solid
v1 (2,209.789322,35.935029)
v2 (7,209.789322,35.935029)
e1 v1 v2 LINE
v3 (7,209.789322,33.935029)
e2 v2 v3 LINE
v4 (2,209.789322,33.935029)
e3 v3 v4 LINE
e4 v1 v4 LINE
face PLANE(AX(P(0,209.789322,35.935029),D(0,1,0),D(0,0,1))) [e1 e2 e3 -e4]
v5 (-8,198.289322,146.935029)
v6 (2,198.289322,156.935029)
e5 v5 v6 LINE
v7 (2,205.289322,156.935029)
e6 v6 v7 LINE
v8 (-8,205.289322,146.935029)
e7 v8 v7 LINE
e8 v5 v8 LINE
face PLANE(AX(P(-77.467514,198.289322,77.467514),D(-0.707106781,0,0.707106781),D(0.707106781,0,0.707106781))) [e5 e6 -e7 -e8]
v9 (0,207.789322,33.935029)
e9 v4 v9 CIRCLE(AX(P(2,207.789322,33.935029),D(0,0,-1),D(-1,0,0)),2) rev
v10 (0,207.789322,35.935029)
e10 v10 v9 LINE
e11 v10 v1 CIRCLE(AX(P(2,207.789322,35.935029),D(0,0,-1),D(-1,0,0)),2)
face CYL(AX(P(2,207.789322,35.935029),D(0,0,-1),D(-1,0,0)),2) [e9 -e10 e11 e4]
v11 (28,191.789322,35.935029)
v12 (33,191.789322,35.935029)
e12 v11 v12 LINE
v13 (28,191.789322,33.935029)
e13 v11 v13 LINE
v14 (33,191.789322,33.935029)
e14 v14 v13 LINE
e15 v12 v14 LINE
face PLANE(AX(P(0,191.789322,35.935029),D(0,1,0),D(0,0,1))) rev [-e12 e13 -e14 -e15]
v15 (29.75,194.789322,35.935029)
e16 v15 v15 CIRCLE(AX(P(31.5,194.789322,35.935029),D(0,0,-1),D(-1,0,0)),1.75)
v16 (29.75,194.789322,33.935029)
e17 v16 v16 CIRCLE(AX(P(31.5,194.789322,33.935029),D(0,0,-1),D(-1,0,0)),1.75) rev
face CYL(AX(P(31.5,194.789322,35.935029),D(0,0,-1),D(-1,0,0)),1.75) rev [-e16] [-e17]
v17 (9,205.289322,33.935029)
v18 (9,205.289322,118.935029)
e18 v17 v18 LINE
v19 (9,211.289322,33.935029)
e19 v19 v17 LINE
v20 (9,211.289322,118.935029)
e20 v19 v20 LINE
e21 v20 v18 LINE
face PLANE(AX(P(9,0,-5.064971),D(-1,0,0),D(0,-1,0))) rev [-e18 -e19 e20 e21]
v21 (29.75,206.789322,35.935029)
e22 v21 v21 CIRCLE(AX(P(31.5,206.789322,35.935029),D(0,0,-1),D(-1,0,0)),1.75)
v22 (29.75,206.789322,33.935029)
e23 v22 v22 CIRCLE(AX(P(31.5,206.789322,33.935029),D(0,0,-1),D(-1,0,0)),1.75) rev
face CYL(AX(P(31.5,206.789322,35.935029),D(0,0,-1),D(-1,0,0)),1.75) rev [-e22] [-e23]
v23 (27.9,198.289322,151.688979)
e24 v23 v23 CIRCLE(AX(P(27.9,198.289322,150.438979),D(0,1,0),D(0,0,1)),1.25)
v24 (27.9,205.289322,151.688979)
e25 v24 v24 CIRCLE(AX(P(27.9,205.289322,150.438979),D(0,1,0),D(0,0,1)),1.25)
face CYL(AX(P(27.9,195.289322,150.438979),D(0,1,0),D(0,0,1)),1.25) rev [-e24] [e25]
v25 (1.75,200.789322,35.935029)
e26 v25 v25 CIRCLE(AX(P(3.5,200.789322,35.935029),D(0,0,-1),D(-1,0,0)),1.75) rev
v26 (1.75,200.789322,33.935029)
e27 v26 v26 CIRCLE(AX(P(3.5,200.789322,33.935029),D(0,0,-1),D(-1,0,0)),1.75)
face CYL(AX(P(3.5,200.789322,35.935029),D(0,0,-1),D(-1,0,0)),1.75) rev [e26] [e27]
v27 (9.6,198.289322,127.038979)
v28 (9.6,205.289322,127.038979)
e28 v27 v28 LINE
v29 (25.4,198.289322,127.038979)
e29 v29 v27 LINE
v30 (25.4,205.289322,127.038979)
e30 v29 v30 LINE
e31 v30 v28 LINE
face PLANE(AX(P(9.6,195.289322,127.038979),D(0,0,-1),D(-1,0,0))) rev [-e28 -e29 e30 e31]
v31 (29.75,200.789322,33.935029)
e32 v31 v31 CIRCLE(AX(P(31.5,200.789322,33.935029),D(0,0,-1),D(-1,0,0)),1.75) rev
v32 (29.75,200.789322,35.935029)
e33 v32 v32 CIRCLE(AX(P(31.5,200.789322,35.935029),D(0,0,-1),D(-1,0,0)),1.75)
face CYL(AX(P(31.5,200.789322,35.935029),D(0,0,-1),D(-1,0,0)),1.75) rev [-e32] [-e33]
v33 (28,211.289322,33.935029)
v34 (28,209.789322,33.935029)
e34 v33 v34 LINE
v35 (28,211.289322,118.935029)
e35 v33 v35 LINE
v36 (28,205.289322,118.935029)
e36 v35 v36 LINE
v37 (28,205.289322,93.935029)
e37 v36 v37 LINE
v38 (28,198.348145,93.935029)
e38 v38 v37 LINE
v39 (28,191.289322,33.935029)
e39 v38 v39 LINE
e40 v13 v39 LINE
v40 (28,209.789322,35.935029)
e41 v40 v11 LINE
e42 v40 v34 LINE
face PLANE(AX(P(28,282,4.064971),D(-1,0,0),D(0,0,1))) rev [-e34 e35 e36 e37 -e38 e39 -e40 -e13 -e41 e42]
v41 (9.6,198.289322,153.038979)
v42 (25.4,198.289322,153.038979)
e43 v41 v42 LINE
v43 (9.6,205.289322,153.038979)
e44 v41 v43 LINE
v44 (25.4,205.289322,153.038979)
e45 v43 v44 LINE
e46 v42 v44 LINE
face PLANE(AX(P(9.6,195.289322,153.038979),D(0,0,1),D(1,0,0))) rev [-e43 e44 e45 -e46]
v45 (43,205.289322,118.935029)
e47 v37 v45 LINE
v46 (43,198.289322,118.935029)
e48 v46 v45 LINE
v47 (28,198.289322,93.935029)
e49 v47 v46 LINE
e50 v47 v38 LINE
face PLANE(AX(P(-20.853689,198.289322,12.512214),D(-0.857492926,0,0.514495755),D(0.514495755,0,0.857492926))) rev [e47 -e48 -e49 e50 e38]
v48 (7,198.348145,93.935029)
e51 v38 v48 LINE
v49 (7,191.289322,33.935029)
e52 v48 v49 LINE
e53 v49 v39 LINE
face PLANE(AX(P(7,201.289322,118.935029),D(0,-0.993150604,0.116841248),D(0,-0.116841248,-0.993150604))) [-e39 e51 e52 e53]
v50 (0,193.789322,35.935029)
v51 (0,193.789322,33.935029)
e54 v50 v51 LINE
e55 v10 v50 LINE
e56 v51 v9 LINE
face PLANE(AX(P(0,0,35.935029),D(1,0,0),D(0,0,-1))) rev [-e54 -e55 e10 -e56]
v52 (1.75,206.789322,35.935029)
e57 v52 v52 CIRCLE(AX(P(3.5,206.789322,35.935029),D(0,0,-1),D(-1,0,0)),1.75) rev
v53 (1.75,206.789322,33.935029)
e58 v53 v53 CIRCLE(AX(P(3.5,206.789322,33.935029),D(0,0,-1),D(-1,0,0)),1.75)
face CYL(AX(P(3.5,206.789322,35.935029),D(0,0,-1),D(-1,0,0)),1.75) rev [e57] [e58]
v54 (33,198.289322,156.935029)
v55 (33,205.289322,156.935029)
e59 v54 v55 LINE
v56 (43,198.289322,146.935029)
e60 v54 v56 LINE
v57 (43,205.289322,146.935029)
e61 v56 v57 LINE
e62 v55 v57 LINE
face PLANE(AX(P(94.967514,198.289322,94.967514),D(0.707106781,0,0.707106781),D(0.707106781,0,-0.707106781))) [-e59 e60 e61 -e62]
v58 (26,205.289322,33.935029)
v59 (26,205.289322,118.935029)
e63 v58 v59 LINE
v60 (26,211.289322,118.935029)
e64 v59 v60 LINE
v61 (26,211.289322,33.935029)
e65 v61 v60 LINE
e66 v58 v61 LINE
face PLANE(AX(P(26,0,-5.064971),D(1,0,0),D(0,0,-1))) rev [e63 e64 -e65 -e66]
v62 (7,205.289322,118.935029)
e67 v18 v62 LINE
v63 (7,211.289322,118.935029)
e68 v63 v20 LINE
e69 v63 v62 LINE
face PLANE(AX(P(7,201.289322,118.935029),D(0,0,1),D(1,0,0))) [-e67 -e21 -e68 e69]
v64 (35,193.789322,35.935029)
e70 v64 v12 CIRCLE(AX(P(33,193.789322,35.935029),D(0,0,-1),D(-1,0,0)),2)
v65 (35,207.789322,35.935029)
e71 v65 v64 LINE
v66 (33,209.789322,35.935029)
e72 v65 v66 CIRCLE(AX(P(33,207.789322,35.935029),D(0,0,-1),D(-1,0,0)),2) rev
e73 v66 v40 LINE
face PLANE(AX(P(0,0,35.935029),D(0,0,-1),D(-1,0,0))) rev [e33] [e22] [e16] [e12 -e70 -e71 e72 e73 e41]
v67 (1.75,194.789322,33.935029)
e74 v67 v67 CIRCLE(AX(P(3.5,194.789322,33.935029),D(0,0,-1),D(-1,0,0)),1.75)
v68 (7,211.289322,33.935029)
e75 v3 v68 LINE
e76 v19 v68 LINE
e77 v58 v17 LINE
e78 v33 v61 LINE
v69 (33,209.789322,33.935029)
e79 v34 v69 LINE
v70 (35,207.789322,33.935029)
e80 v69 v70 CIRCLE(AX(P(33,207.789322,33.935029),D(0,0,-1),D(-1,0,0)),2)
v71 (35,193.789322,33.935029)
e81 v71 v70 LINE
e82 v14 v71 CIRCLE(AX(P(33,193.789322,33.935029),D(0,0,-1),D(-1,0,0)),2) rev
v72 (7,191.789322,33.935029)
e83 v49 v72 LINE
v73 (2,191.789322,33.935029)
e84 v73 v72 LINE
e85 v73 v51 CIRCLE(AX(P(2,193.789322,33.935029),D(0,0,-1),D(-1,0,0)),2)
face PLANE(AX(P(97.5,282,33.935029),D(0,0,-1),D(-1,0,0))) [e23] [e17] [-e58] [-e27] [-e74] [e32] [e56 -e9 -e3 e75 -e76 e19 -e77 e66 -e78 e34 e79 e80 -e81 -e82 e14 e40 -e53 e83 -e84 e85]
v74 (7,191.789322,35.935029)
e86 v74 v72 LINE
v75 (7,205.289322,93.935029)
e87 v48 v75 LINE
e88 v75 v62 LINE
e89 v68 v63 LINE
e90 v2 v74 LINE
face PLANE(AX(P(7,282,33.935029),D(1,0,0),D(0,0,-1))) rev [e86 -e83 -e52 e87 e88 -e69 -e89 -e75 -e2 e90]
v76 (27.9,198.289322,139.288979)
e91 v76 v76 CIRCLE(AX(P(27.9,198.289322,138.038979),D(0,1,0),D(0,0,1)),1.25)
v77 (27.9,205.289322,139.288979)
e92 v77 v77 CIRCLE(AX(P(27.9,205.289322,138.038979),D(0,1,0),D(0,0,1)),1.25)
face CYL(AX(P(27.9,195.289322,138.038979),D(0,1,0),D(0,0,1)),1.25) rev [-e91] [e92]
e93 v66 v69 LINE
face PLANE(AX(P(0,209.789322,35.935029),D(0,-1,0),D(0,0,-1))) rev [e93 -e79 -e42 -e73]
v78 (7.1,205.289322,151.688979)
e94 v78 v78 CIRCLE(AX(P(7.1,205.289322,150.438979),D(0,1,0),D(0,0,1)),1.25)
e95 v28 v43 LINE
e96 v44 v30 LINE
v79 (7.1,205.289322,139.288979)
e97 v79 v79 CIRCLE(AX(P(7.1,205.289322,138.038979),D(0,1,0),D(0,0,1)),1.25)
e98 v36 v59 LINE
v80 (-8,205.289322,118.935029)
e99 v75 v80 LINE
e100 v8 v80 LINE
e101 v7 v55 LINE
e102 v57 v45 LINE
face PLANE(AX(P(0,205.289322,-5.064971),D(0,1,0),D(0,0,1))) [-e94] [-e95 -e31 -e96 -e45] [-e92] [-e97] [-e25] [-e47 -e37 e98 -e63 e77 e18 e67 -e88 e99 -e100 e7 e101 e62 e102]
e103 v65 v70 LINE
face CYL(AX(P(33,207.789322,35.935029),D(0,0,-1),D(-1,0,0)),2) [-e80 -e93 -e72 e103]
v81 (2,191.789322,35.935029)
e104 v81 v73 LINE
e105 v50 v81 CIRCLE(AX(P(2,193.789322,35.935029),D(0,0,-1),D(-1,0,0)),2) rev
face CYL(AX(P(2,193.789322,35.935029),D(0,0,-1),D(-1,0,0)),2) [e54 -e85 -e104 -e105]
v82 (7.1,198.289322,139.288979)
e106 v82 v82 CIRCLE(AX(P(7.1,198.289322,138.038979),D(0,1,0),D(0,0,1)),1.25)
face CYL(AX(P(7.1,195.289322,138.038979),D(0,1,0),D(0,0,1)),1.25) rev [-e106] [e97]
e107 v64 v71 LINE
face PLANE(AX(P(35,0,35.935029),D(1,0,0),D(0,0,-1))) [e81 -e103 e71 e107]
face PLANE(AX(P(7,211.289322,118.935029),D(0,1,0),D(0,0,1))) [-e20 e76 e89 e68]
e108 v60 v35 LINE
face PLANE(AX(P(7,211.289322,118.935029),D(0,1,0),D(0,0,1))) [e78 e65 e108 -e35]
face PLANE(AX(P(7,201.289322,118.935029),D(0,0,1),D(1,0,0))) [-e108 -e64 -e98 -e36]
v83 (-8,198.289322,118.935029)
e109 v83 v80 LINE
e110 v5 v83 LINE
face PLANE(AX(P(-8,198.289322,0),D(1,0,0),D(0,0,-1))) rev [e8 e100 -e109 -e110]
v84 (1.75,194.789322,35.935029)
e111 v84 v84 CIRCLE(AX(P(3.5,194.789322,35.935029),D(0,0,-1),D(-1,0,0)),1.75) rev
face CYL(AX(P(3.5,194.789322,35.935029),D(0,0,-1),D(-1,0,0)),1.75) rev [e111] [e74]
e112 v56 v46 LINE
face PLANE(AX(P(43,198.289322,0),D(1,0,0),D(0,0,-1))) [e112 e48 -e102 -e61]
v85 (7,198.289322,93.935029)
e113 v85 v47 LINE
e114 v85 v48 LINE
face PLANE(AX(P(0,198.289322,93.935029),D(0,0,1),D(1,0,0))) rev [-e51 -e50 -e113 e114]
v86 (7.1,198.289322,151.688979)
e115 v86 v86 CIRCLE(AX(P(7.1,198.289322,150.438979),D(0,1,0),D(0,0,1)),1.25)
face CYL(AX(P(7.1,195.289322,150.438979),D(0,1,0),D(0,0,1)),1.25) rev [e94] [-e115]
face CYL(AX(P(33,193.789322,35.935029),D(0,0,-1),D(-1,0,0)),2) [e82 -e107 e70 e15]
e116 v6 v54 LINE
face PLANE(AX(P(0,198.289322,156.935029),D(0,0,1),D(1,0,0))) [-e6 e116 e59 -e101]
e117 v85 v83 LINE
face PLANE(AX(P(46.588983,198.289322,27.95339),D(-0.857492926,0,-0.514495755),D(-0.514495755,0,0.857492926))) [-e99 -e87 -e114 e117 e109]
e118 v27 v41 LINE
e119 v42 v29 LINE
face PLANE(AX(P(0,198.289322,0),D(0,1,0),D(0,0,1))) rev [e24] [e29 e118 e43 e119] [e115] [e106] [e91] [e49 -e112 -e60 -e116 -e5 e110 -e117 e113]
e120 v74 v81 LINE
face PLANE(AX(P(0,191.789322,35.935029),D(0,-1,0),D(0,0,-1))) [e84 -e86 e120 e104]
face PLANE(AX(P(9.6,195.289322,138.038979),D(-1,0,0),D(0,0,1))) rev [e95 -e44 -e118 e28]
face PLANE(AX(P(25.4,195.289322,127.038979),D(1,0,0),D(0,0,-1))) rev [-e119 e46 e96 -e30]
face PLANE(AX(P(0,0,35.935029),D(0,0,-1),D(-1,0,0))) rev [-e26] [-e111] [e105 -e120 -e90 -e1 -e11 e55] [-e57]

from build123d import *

# Parameters (mm, degrees)
ESQUISSE1_W                  = 35
ESQUISSE1_H                  = 35
BOSS_EXTRU_1_DEPTH           = 2
ESQUISSE2_R                  = 1.75
ESQUISSE2_W                  = 35
ESQUISSE2_H                  = 1.064971157
ENL_V_MAT_EXTRU_1_DEPTH      = 2
BOSS_EXTRU_2_DEPTH           = 280
ESQUISSE5_W                  = 7
ESQUISSE5_H                  = 6
ESQUISSE5_R                  = 1.75
BOSS_EXTRU_3_DEPTH           = 2
ESQUISSE6_R                  = 1.75
BOSS_EXTRU_4_DEPTH           = 2
ESQUISSE10_W                 = 35
ESQUISSE10_H                 = 33.935028843
ESQUISSE10_R                 = 1.75
BOSS_EXTRU_5_DEPTH           = 2
ESQUISSE15_R                 = 6.5
ESQUISSE15_R_2               = 1.75
ENL_V_MAT_EXTRU_2_DEPTH      = 373
CONG_1_R                     = 2
CONG_2_R                     = 4
EXTRU_MINCE1_START           = -2
EXTRU_MINCE1_OUTLINE_W       = 35
EXTRU_MINCE1_OUTLINE_H       = 10
EXTRU_MINCE1_DEPTH           = 2
BOSS_EXTRU_7_DEPTH           = 62.5
BOSS_EXTRU_8_DEPTH           = 160
ENL_V_MAT_EXTRU_4_DEPTH      = 15
BOSS_EXTRU_31_DEPTH          = 69.5
BOSS_EXTRU_31_DEPTH_BACK     = 90.5
ESQUISSE29_W                 = 0.210775501
ESQUISSE29_H                 = 2
BOSS_EXTRU_32_DEPTH          = 160
ENL_V_MAT_EXTRU_7_DEPTH      = 10
ENL_V_MAT_EXTRU_7_DEPTH_BACK = 5
ESQUISSE34_W                 = 144
ESQUISSE34_H                 = 64.710678118
ENL_V_MAT_EXTRU_8_DEPTH      = 2
ESQUISSE35_R                 = 1.5
BOSS_EXTRU_35_DEPTH          = 2
BOSS_EXTRU_36_START          = -2
ESQUISSE36_R                 = 1.5
BOSS_EXTRU_36_DEPTH          = 2
BOSS_EXTRU_37_DEPTH          = 21
BOSS_EXTRU_38_DEPTH          = 28
ESQUISSE42_W                 = 17
ESQUISSE42_H                 = 6
ENL_V_MAT_EXTRU_9_DEPTH      = 124
ESQUISSE43_R                 = 1.1
ENL_V_MAT_EXTRU_11_DEPTH     = 50
ESQUISSE45_R                 = 1.5
ENL_V_MAT_EXTRU_12_DEPTH     = 50
ESQUISSE47_R                 = 1.75
BOSS_EXTRU_40_DEPTH          = 2
ENL_V_MAT_EXTRU_13_DEPTH     = 2
ESQUISSE49_R                 = 1.75
BOSS_EXTRU_41_DEPTH          = 2
ESQUISSE50_W                 = 12.927363302
ESQUISSE50_H                 = 18
ENL_V_MAT_EXTRU_14_DEPTH     = 2
ESQUISSE51_R                 = 1.75
BOSS_EXTRU_42_DEPTH          = 2
BOSS_EXTRU_43_DEPTH          = 2
BOSS_EXTRU_43_DEPTH_BACK     = 2
ESQUISSE53_R                 = 1.75
ENL_V_START                  = -2
ESQUISSE54_R                 = 1.75
ENL_V_MAT_EXTRU_15_DEPTH     = 2
BOSS_EXTRU_44_DEPTH          = 2
BOSS_EXTRU_44_DEPTH_BACK     = 2
ESQUISSE55_R                 = 1.75
ESQUISSE56_R                 = 1.75
ESQUISSE56_R_2               = 6.5
ENL_V_MAT_EXTRU_16_DEPTH     = 305
ESQUISSE57_W                 = 160
ESQUISSE57_H                 = 70.710678119
ENL_V_MAT_EXTRU_17_DEPTH     = 305
BOSS_EXTRU_46_DEPTH          = 2
BOSS_EXTRU_46_DEPTH_BACK     = 5
ESQUISSE60_R                 = 1.1
ESQUISSE61_R                 = 1.25
ENL_V_MAT_EXTRU_18_DEPTH     = 10
BOSS_EXTRU_47_START          = -7
ESQUISSE64_R                 = 1.1
BOSS_EXTRU_47_DEPTH          = 7


# Read off the part's stored shape, not the designer's step: Extru.-Mince1
with BuildPart() as part:
    # Esquisse1 → Boss.-Extru.1 (new body)
    with BuildSketch(Plane(origin=(0, 0, 0), x_dir=(1, 0, 0), z_dir=(0, 1, 0))):
        with Locations((17.5, -17.5)):
            Rectangle(ESQUISSE1_W, ESQUISSE1_H)
    extrude(amount=BOSS_EXTRU_1_DEPTH)

    # Esquisse2 → Enlèv. mat.-Extru.1 (cut)
    with BuildSketch(Plane(origin=(0, 2, 0), x_dir=(1, 0, 0), z_dir=(0, 1, 0))):
        with Locations(Location((30.935029054, -4.064971369, 0), (0, 0, 270))):
            Circle(ESQUISSE2_R)
        with Locations(Location((30.935028843, -30.935028843, 0), (0, 0, 270))):
            Circle(ESQUISSE2_R)
        with Locations(Location((4.064971369, -4.064970946, 0), (0, 0, 270))):
            Circle(ESQUISSE2_R)
        with Locations(Location((4.064971157, -30.935028843, 0), (0, 0, 270))):
            Circle(ESQUISSE2_R)
        with Locations((17.5, -34.467514421)):
            Rectangle(ESQUISSE2_W, ESQUISSE2_H)
    extrude(amount=-ENL_V_MAT_EXTRU_1_DEPTH, mode=Mode.SUBTRACT)

    # Esquisse4 → Boss.-Extru.2 (add)
    with BuildSketch(Plane(origin=(0, 2, 0), x_dir=(1, 0, 0), z_dir=(0, 1, 0))):
        Polygon((17.5, -33.935028843), (7, -33.935028843), (7, -4.064970946), (28, -4.064970946), (28, -33.935028843), align=None)
    extrude(amount=BOSS_EXTRU_2_DEPTH)

    # Esquisse5 → Boss.-Extru.3 (add)
    # profile 1 of 4: a face of its own
    with BuildSketch(Plane.XY.offset(33.935028843)):
        with Locations((31.5, 254)):
            Rectangle(ESQUISSE5_W, ESQUISSE5_H)
        with Locations((31.5, 254)):
            Circle(ESQUISSE5_R, mode=Mode.SUBTRACT)
    # profile 2 of 4: a face of its own
    with BuildSketch(Plane.XY.offset(33.935028843)):
        with Locations((3.5, 254)):
            Rectangle(ESQUISSE5_W, ESQUISSE5_H)
        with Locations((3.5, 254)):
            Circle(ESQUISSE5_R, mode=Mode.SUBTRACT)
    # profile 3 of 4: a face of its own
    with BuildSketch(Plane.XY.offset(33.935028843)):
        with Locations((31.5, 28)):
            Rectangle(ESQUISSE5_W, ESQUISSE5_H)
        with Locations((31.5, 28)):
            Circle(ESQUISSE5_R, mode=Mode.SUBTRACT)
    # profile 4 of 4: a face of its own
    with BuildSketch(Plane.XY.offset(33.935028843)):
        with Locations((3.5, 28)):
            Rectangle(ESQUISSE5_W, ESQUISSE5_H)
        with Locations((3.5, 28)):
            Circle(ESQUISSE5_R, mode=Mode.SUBTRACT)
    extrude(amount=-BOSS_EXTRU_3_DEPTH)

    # Esquisse6 → Boss.-Extru.4 (add)
    # profile 1 of 2: a face of its own
    with BuildSketch(Plane.XY.offset(33.935028843)):
        Polygon((7, 144), (0, 144), (0, 141), (0, 138), (7, 138), (7, 141), align=None)
        with Locations((3.5, 141)):
            Circle(ESQUISSE6_R, mode=Mode.SUBTRACT)
    # profile 2 of 2: a face of its own
    with BuildSketch(Plane.XY.offset(33.935028843)):
        Polygon((35, 144), (28, 144), (28, 141), (28, 138), (35, 138), (35, 141), align=None)
        with Locations((31.5, 141)):
            Circle(ESQUISSE6_R, mode=Mode.SUBTRACT)
    extrude(amount=-BOSS_EXTRU_4_DEPTH)

    # Esquisse10 → Boss.-Extru.5 (add)
    with BuildSketch(Plane(origin=(0, 282, 0), x_dir=(1, 0, 0), z_dir=(0, 1, 0))):
        with Locations((17.5, -16.967514422)):
            Rectangle(ESQUISSE10_W, ESQUISSE10_H)
        with Locations(Location((30.935028843, -30.935028843, 0), (0, 0, 270))):
            Circle(ESQUISSE10_R, mode=Mode.SUBTRACT)
        with Locations(Location((30.935028631, -4.064970946, 0), (0, 0, 270.000013863))):
            Circle(ESQUISSE10_R, mode=Mode.SUBTRACT)
        with Locations(Location((4.064970946, -4.064971369, 0), (0, 0, 270.000013863))):
            Circle(ESQUISSE10_R, mode=Mode.SUBTRACT)
        with Locations(Location((4.064971157, -30.935028843, 0), (0, 0, 270))):
            Circle(ESQUISSE10_R, mode=Mode.SUBTRACT)
    extrude(amount=-BOSS_EXTRU_5_DEPTH)

    # Esquisse15 → Enlèv. mat.-Extru.2 (cut)
    with BuildSketch(Plane(origin=(0, 282, 0), x_dir=(1, 0, 0), z_dir=(0, 1, 0))):
        with Locations(Location((17.5, -17.5, 0), (0, 0, 270))):
            Circle(ESQUISSE15_R)
        with Locations(Location((30.935029054, -4.064971369, 0), (0, 0, 270))):
            Circle(ESQUISSE15_R_2)
    extrude(amount=-ENL_V_MAT_EXTRU_2_DEPTH, mode=Mode.SUBTRACT)

    # Congé1
    cong_1_edges = [part.edges().sort_by_distance(p)[0] for p in [
        (0, 31, 32.935028843),
        (0, 25, 32.935028843),
        (0, 144, 32.935028843),
        (0, 138, 32.935028843),
        (35, 144, 32.935028843),
        (35, 138, 32.935028843),
        (35, 257, 32.935028843),
        (35, 251, 32.935028843),
        (0, 251, 32.935028843),
        (0, 257, 32.935028843),
        (35, 31, 32.935028843),
        (35, 25, 32.935028843),
    ]]
    fillet(cong_1_edges, radius=CONG_1_R)

    # Congé2
    cong_2_edges = [part.edges().sort_by_distance(p)[0] for p in [
        (35, 281, 0),
        (0, 281, 0),
        (0, 1, 0),
        (35, 1, 0),
    ]]
    fillet(cong_2_edges, radius=CONG_2_R)

    # Extru.-Mince1 outline → Extru.-Mince1 (add)
    with BuildSketch(Plane(origin=(0, 282, 0), x_dir=(1, 0, 0), z_dir=(0, 1, 0)).offset(EXTRU_MINCE1_START)):
        with Locations((17.5, -38.935028843)):
            Rectangle(EXTRU_MINCE1_OUTLINE_W, EXTRU_MINCE1_OUTLINE_H)
    extrude(amount=EXTRU_MINCE1_DEPTH)

    # Esquisse20 → Boss.-Extru.7 (add)
    with BuildSketch(Plane.ZY):
        Polygon((43.935028843, 282), (114.645706961, 211.289321881), (110.645706961, 211.289321881), (41.935028843, 280), (34.145804344, 280), (34.145804344, 282), align=None)
    extrude(amount=BOSS_EXTRU_7_DEPTH)

    # Esquisse21 → Boss.-Extru.8 (add)
    with BuildSketch(Plane.ZY.offset(62.5)):
        Polygon((34.145804344, 280), (41.935028843, 280), (110.645706961, 211.289321881), (114.645706961, 211.289321881), (43.935028843, 282), (34.145804344, 282), align=None)
    extrude(amount=-BOSS_EXTRU_8_DEPTH)

    # Esquisse22 → Enlèv. mat.-Extru.4 (cut)
    with BuildSketch(Plane(origin=(0, 162.967514421, 162.967514421), x_dir=(1, 0, 0), z_dir=(0, 0.7071067811865462, 0.7071067811865488))):
        Polygon((-42.064466094, 147.626821562), (-45.6, 147.626821562), (-45.6, 89.047889374), (-42.064466094, 89.047889374), (-42.064466094, 85.512355468), (77.064466094, 85.512355468), (77.064466094, 89.047889374), (80.6, 89.047889374), (80.6, 147.626821562), (77.064466094, 147.626821562), (77.064466094, 151.162355468), (-42.064466094, 151.162355468), align=None)
    extrude(amount=-ENL_V_MAT_EXTRU_4_DEPTH, mode=Mode.SUBTRACT)

    # Esquisse29 → Boss.-Extru.31 (add, two sides: drawn at the far end of the back side and taken through both)
    with BuildSketch(Plane.ZY.offset(-7).offset(-BOSS_EXTRU_31_DEPTH_BACK)):
        with Locations((34.040416594, 281)):
            Rectangle(ESQUISSE29_W, ESQUISSE29_H)
    extrude(amount=BOSS_EXTRU_31_DEPTH + BOSS_EXTRU_31_DEPTH_BACK)

    # Esquisse32 → Boss.-Extru.32 (add)
    with BuildSketch(Plane.ZY.offset(62.5)):
        Polygon((110.645706961, 211.289321881), (33.935028843, 211.289321881), (33.935028843, 280), (35.935028843, 280), (35.935028843, 213.289321881), (108.645706961, 213.289321881), align=None)
    extrude(amount=-BOSS_EXTRU_32_DEPTH)

    # Esquisse33 → Enlèv. mat.-Extru.7 (cut, two sides: drawn at the far end of the back side and taken through both)
    with BuildSketch(Plane(origin=(0, 0, 33.935028843), x_dir=(-1, 0, 0), z_dir=(0, 0, -1)).offset(-ENL_V_MAT_EXTRU_7_DEPTH_BACK)):
        Polygon((-28, 274.000000001), (-89.5, 274.000000001), (-89.5, 219.289321881), (-81.5, 219.289321881), (-28, 219.289321881), align=None)
        with BuildLine():
            Line((54.5, 274.000000001), (-7, 274.000000001))
            Line((-7, 274.000000001), (-7, 257))
            Line((-7, 257), (-2, 257))
            ThreePointArc((-2, 257), (-0.585786438, 256.414213562), (0, 255))
            Line((0, 255), (0, 253))
            ThreePointArc((0, 253), (-0.585786438, 251.585786438), (-2, 251))
            Line((-2, 251), (-7, 251))
            Line((-7, 251), (-7, 219.289321881))
            Line((-7, 219.289321881), (1, 219.289321881))
            Line((1, 219.289321881), (54.5, 219.289321881))
            Line((54.5, 219.289321881), (54.5, 274.000000001))
        make_face()
        with BuildLine():
            Line((-2, 257), (-7, 257))
            Line((-7, 257), (-7, 251))
            Line((-7, 251), (-2, 251))
            ThreePointArc((-2, 251), (-0.585786438, 251.585786438), (0, 253))
            Line((0, 253), (0, 255))
            ThreePointArc((0, 255), (-0.585786438, 256.414213562), (-2, 257))
        make_face()
    extrude(amount=ENL_V_MAT_EXTRU_7_DEPTH + ENL_V_MAT_EXTRU_7_DEPTH_BACK, mode=Mode.SUBTRACT)

    # Esquisse34 → Enlèv. mat.-Extru.8 (cut)
    with BuildSketch(Plane.XZ.offset(-211.289321881)):
        with Locations((17.5, 74.290367902)):
            Rectangle(ESQUISSE34_W, ESQUISSE34_H)
    extrude(amount=-ENL_V_MAT_EXTRU_8_DEPTH, mode=Mode.SUBTRACT)

    # Esquisse35 → Boss.-Extru.35 (add)
    with BuildSketch(Plane(origin=(97.5, 0, 0), x_dir=(0, 0, -1), z_dir=(1, 0, 0))):
        Polygon((-35.935028843, 280), (-35.935028843, 274.000000001), (-35.935028843, 213.289321881), (-108.645706961, 213.289321881), (-102.645706961, 219.289321881), (-41.935028842, 219.289321881), (-41.935028842, 274.000000001), (-47.935028841, 274.000000001), (-41.935028843, 280), align=None)
        with Locations((-38.935028842, 216.289321881)):
            Circle(ESQUISSE35_R, mode=Mode.SUBTRACT)
        with Locations((-38.935028842, 277.000000001)):
            Circle(ESQUISSE35_R, mode=Mode.SUBTRACT)
        with Locations((-99.645706961, 216.289321881)):
            Circle(ESQUISSE35_R, mode=Mode.SUBTRACT)
    extrude(amount=-BOSS_EXTRU_35_DEPTH)

    # Esquisse36 → Boss.-Extru.36 (add)
    with BuildSketch(Plane.ZY.offset(62.5).offset(BOSS_EXTRU_36_START)):
        Polygon((35.935028843, 213.289321881), (108.645706961, 213.289321881), (102.645706961, 219.289321881), (41.935028842, 219.289321881), (41.935028842, 274.000000001), (47.935028841, 274.000000001), (41.935028843, 280), (35.935028843, 280), (35.935028843, 274.000000001), align=None)
        with Locations(Location((99.645706961, 216.289321881, 0), (0, 0, 180))):
            Circle(ESQUISSE36_R, mode=Mode.SUBTRACT)
        with Locations(Location((38.935028842, 277.000000001, 0), (0, 0, 180))):
            Circle(ESQUISSE36_R, mode=Mode.SUBTRACT)
        with Locations(Location((38.935028842, 216.289321881, 0), (0, 0, 180))):
            Circle(ESQUISSE36_R, mode=Mode.SUBTRACT)
    extrude(amount=BOSS_EXTRU_36_DEPTH)

    # Esquisse39 → Boss.-Extru.37 (add)
    with BuildSketch(Plane(origin=(28, 0, 0), x_dir=(0, 0, -1), z_dir=(1, 0, 0))):
        Polygon((-33.935028843, 211.289321881), (-33.935028843, 191.289321881), (-118.935028843, 201.289321881), (-118.935028843, 211.289321881), align=None)
    extrude(amount=-BOSS_EXTRU_37_DEPTH)

    # Esquisse40 → Boss.-Extru.38 (add)
    with BuildSketch(Plane.XY.offset(118.935028843)):
        Polygon((7, 201.289321881), (2, 201.289321881), (2, 203.289321881), (33, 203.289321881), (33, 201.289321881), (28, 201.289321881), align=None)
    extrude(amount=BOSS_EXTRU_38_DEPTH)

    # Esquisse42 → Enlèv. mat.-Extru.9 (cut)
    with BuildSketch(Plane.XY.offset(118.935028843)):
        with Locations((17.5, 208.289321881)):
            Rectangle(ESQUISSE42_W, ESQUISSE42_H)
    extrude(amount=-ENL_V_MAT_EXTRU_9_DEPTH, mode=Mode.SUBTRACT)

    # Esquisse43 → Enlèv. mat.-Extru.11 (cut)
    with BuildSketch(Plane(origin=(0, 203.289321881, 0), x_dir=(1, 0, 0), z_dir=(0, 1, 0))):
        with Locations(Location((5, -144.935028843, 0), (0, 0, 270))):
            Circle(ESQUISSE43_R)
        with Locations(Location((30, -144.935028843, 0), (0, 0, 270))):
            Circle(ESQUISSE43_R)
        with Locations(Location((5, -130.435028843, 0), (0, 0, 270))):
            Circle(ESQUISSE43_R)
        with Locations(Location((30, -130.435028843, 0), (0, 0, 270))):
            Circle(ESQUISSE43_R)
        with BuildLine():
            Line((5, -123.319506434), (5, -128.435028843))
            ThreePointArc((5, -128.435028843), (7, -130.435028843), (5, -132.435028843))
            Line((5, -132.435028843), (5, -142.935028843))
            ThreePointArc((5, -142.935028843), (6.414213562, -143.52081528), (7, -144.935028843))
            Line((7, -144.935028843), (28, -144.935028843))
            ThreePointArc((28, -144.935028843), (28.585786438, -143.52081528), (30, -142.935028843))
            Line((30, -142.935028843), (30, -132.435028843))
            ThreePointArc((30, -132.435028843), (28, -130.435028843), (30, -128.435028843))
            Line((30, -128.435028843), (30, -123.319506434))
            Line((30, -123.319506434), (5, -123.319506434))
        make_face()
    extrude(amount=-ENL_V_MAT_EXTRU_11_DEPTH, mode=Mode.SUBTRACT)

    # Esquisse45 → Enlèv. mat.-Extru.12 (cut)
    with BuildSketch(Plane(origin=(0, 162.967514421, 162.967514421), x_dir=(1, 0, 0), z_dir=(0, 0.7071067811865462, 0.7071067811865488))):
        with Locations(Location((80.6, 151.162355468, 0), (0, 0, 270))):
            Circle(ESQUISSE45_R)
        with Locations(Location((80.6, 85.512355468, 0), (0, 0, 270))):
            Circle(ESQUISSE45_R)
        with Locations(Location((-45.6, 85.512355468, 0), (0, 0, 270))):
            Circle(ESQUISSE45_R)
        with Locations(Location((-45.6, 151.162355468, 0), (0, 0, 270))):
            Circle(ESQUISSE45_R)
    extrude(amount=-ENL_V_MAT_EXTRU_12_DEPTH, mode=Mode.SUBTRACT)

    # Esquisse47 → Boss.-Extru.40 (add)
    # profile 1 of 4: a face of its own
    with BuildSketch(Plane.XY.offset(33.935028843)):
        with BuildLine():
            Line((2, 144), (7, 144))
            Line((7, 144), (7, 150))
            Line((7, 150), (2, 150))
            ThreePointArc((2, 150), (0.585786438, 149.414213562), (0, 148))
            Line((0, 148), (0, 146))
            ThreePointArc((0, 146), (0.585786438, 144.585786438), (2, 144))
        make_face()
        with Locations((3.5, 147)):
            Circle(ESQUISSE47_R, mode=Mode.SUBTRACT)
    # profile 2 of 4: a face of its own
    with BuildSketch(Plane.XY.offset(33.935028843)):
        with BuildLine():
            Line((28, 150), (28, 144))
            Line((28, 144), (33, 144))
            ThreePointArc((33, 144), (34.414213562, 144.585786438), (35, 146))
            Line((35, 146), (35, 148))
            ThreePointArc((35, 148), (34.414213562, 149.414213562), (33, 150))
            Line((33, 150), (28, 150))
        make_face()
        with Locations((31.5, 147)):
            Circle(ESQUISSE47_R, mode=Mode.SUBTRACT)
    # profile 3 of 4: a face of its own
    with BuildSketch(Plane.XY.offset(33.935028843)):
        with BuildLine():
            Line((35, 134), (35, 136))
            ThreePointArc((35, 136), (34.414213562, 137.414213562), (33, 138))
            Line((33, 138), (28, 138))
            Line((28, 138), (28, 132))
            Line((28, 132), (33, 132))
            ThreePointArc((33, 132), (34.414213562, 132.585786438), (35, 134))
        make_face()
        with Locations((31.5, 135)):
            Circle(ESQUISSE47_R, mode=Mode.SUBTRACT)
    # profile 4 of 4: a face of its own
    with BuildSketch(Plane.XY.offset(33.935028843)):
        with BuildLine():
            Line((7, 138), (2, 138))
            ThreePointArc((2, 138), (0.585786438, 137.414213562), (0, 136))
            Line((0, 136), (0, 134))
            ThreePointArc((0, 134), (0.585786438, 132.585786438), (2, 132))
            Line((2, 132), (7, 132))
            Line((7, 132), (7, 138))
        make_face()
        with Locations((3.5, 135)):
            Circle(ESQUISSE47_R, mode=Mode.SUBTRACT)
    extrude(amount=-BOSS_EXTRU_40_DEPTH)

    # Esquisse48 → Enlèv. mat.-Extru.13 (cut)
    with BuildSketch(Plane.XY.offset(33.935028843)):
        Polygon((-4.556540033, 144), (-4.556540033, 138), (2, 138), (7, 138), (7, 144), (2, 144), align=None)
        Polygon((33.295178048, 144), (39.851718081, 144), (39.851718081, 138), (33.295178048, 138), (28.295178048, 138), (28.295178048, 144), align=None)
    extrude(amount=-ENL_V_MAT_EXTRU_13_DEPTH, mode=Mode.SUBTRACT)

    # Esquisse49 → Boss.-Extru.41 (add)
    # profile 1 of 2: a face of its own
    with BuildSketch(Plane.XY.offset(33.935028843)):
        with BuildLine():
            Line((2, 180.289321881), (7, 180.289321881))
            Line((7, 180.289321881), (7, 186.289321881))
            Line((7, 186.289321881), (2, 186.289321881))
            ThreePointArc((2, 186.289321881), (0.585786438, 185.703535444), (0, 184.289321881))
            Line((0, 184.289321881), (0, 182.289321881))
            ThreePointArc((0, 182.289321881), (0.585786438, 180.875108319), (2, 180.289321881))
        make_face()
        with Locations((3.5, 183.289321881)):
            Circle(ESQUISSE49_R, mode=Mode.SUBTRACT)
    # profile 2 of 2: a face of its own
    with BuildSketch(Plane.XY.offset(33.935028843)):
        with BuildLine():
            Line((35, 182.289321881), (35, 184.289321881))
            ThreePointArc((35, 184.289321881), (34.414213562, 185.703535444), (33, 186.289321881))
            Line((33, 186.289321881), (28, 186.289321881))
            Line((28, 186.289321881), (28, 180.289321881))
            Line((28, 180.289321881), (33, 180.289321881))
            ThreePointArc((33, 180.289321881), (34.414213562, 180.875108319), (35, 182.289321881))
        make_face()
        with Locations((31.5, 183.289321881)):
            Circle(ESQUISSE49_R, mode=Mode.SUBTRACT)
    extrude(amount=-BOSS_EXTRU_41_DEPTH)

    # Esquisse50 → Enlèv. mat.-Extru.14 (cut)
    with BuildSketch(Plane.XY.offset(33.935028843)):
        with Locations((34.463681651, 141)):
            Rectangle(ESQUISSE50_W, ESQUISSE50_H)
    extrude(amount=-ENL_V_MAT_EXTRU_14_DEPTH, mode=Mode.SUBTRACT)

    # Esquisse51 → Boss.-Extru.42 (add)
    # profile 1 of 3: a face of its own
    with BuildSketch(Plane.XY.offset(33.935028843)):
        with BuildLine():
            Line((7, 150), (7, 144))
            Line((7, 144), (2, 144))
            ThreePointArc((2, 144), (0.585786438, 144.585786438), (0, 146))
            Line((0, 146), (0, 148))
            ThreePointArc((0, 148), (0.585786438, 149.414213562), (2, 150))
            Line((2, 150), (7, 150))
        make_face()
        with Locations((3.5, 147)):
            Circle(ESQUISSE51_R, mode=Mode.SUBTRACT)
    # profile 2 of 3: a face of its own
    with BuildSketch(Plane.XY.offset(33.935028843)):
        with BuildLine():
            Line((33, 138.018442997), (28, 138.018442997))
            Line((28, 138.018442997), (28, 132.018442997))
            Line((28, 132.018442997), (33, 132.018442997))
            ThreePointArc((33, 132.018442997), (34.414213562, 132.604229434), (35, 134.018442997))
            Line((35, 134.018442997), (35, 136.018442997))
            ThreePointArc((35, 136.018442997), (34.414213562, 137.432656559), (33, 138.018442997))
        make_face()
        with Locations((31.5, 135.018442997)):
            Circle(ESQUISSE51_R, mode=Mode.SUBTRACT)
    # profile 3 of 3: a face of its own
    with BuildSketch(Plane.XY.offset(33.935028843)):
        with BuildLine():
            Line((33, 150), (28, 150))
            Line((28, 150), (28, 144))
            Line((28, 144), (33, 144))
            ThreePointArc((33, 144), (34.414213562, 144.585786438), (35, 146))
            Line((35, 146), (35, 148))
            ThreePointArc((35, 148), (34.414213562, 149.414213562), (33, 150))
        make_face()
        with Locations((31.5, 147)):
            Circle(ESQUISSE51_R, mode=Mode.SUBTRACT)
    extrude(amount=-BOSS_EXTRU_42_DEPTH)

    # Esquisse53 → Boss.-Extru.43 (add, two sides: drawn at the far end of the back side and taken through both)
    # profile 1 of 4: a face of its own
    with BuildSketch(Plane(origin=(0, 0, 33.935028843), x_dir=(-1, 0, 0), z_dir=(0, 0, -1)).offset(-BOSS_EXTRU_43_DEPTH_BACK)):
        with BuildLine():
            Line((0, 275.000000001), (0, 273.000000001))
            ThreePointArc((0, 273.000000001), (-0.585786438, 271.585786439), (-2, 271.000000001))
            Line((-2, 271.000000001), (-7, 271.000000001))
            Line((-7, 271.000000001), (-7, 277.000000001))
            Line((-7, 277.000000001), (-2, 277.000000001))
            ThreePointArc((-2, 277.000000001), (-0.585786438, 276.414213564), (0, 275.000000001))
        make_face()
        with Locations(Location((-3.5, 274.000000001, 0), (0, 0, 180))):
            Circle(ESQUISSE53_R, mode=Mode.SUBTRACT)
    # profile 2 of 4: a face of its own
    with BuildSketch(Plane(origin=(0, 0, 33.935028843), x_dir=(-1, 0, 0), z_dir=(0, 0, -1)).offset(-BOSS_EXTRU_43_DEPTH_BACK)):
        with BuildLine():
            Line((-28, 222.289321881), (-28, 216.289321881))
            Line((-28, 216.289321881), (-33, 216.289321881))
            ThreePointArc((-33, 216.289321881), (-34.414213562, 216.875108319), (-35, 218.289321881))
            Line((-35, 218.289321881), (-35, 220.289321881))
            ThreePointArc((-35, 220.289321881), (-34.414213562, 221.703535444), (-33, 222.289321881))
            Line((-33, 222.289321881), (-28, 222.289321881))
        make_face()
        with Locations((-31.5, 219.289321881)):
            Circle(ESQUISSE53_R, mode=Mode.SUBTRACT)
    # profile 3 of 4: a face of its own
    with BuildSketch(Plane(origin=(0, 0, 33.935028843), x_dir=(-1, 0, 0), z_dir=(0, 0, -1)).offset(-BOSS_EXTRU_43_DEPTH_BACK)):
        with BuildLine():
            Line((-28, 277.000000001), (-28, 271.000000001))
            Line((-28, 271.000000001), (-33, 271.000000001))
            ThreePointArc((-33, 271.000000001), (-34.414213562, 271.585786439), (-35, 273.000000001))
            Line((-35, 273.000000001), (-35, 275.000000001))
            ThreePointArc((-35, 275.000000001), (-34.414213562, 276.414213564), (-33, 277.000000001))
            Line((-33, 277.000000001), (-28, 277.000000001))
        make_face()
        with Locations((-31.5, 274.000000001)):
            Circle(ESQUISSE53_R, mode=Mode.SUBTRACT)
    # profile 4 of 4: a face of its own
    with BuildSketch(Plane(origin=(0, 0, 33.935028843), x_dir=(-1, 0, 0), z_dir=(0, 0, -1)).offset(-BOSS_EXTRU_43_DEPTH_BACK)):
        with BuildLine():
            Line((0, 220.289321881), (0, 218.289321881))
            ThreePointArc((0, 218.289321881), (-0.585786438, 216.875108319), (-2, 216.289321881))
            Line((-2, 216.289321881), (-7, 216.289321881))
            Line((-7, 216.289321881), (-7, 222.289321881))
            Line((-7, 222.289321881), (-2, 222.289321881))
            ThreePointArc((-2, 222.289321881), (-0.585786438, 221.703535444), (0, 220.289321881))
        make_face()
        with Locations(Location((-3.5, 219.289321881, 0), (0, 0, 180))):
            Circle(ESQUISSE53_R, mode=Mode.SUBTRACT)
    extrude(amount=BOSS_EXTRU_43_DEPTH + BOSS_EXTRU_43_DEPTH_BACK)

    # Esquisse54 → Enlèv. mat.-Extru.15 (cut)
    with BuildSketch(Plane(origin=(0, 0, 33.935028843), x_dir=(-1, 0, 0), z_dir=(0, 0, -1)).offset(ENL_V_START)):
        with Locations((-31.5, 274.000000001)):
            Circle(ESQUISSE54_R)
        with Locations(Location((-3.5, 274.000000001, 0), (0, 0, 180))):
            Circle(ESQUISSE54_R)
        with Locations((-31.5, 219.289321881)):
            Circle(ESQUISSE54_R)
        with Locations(Location((-3.5, 219.289321881, 0), (0, 0, 180))):
            Circle(ESQUISSE54_R)
    extrude(amount=ENL_V_MAT_EXTRU_15_DEPTH, mode=Mode.SUBTRACT)

    # Esquisse55 → Boss.-Extru.44 (add, two sides: drawn at the far end of the back side and taken through both)
    # profile 1 of 2: a face of its own
    with BuildSketch(Plane(origin=(0, 0, 33.935028843), x_dir=(-1, 0, 0), z_dir=(0, 0, -1)).offset(-BOSS_EXTRU_44_DEPTH_BACK)):
        with BuildLine():
            Line((0, 207.789321881), (0, 205.789321881))
            Line((0, 205.789321881), (0, 201.789321881))
            Line((0, 201.789321881), (0, 199.789321881))
            Line((0, 199.789321881), (0, 195.789321881))
            Line((0, 195.789321881), (0, 193.789321881))
            ThreePointArc((0, 193.789321881), (-0.585786438, 192.375108319), (-2, 191.789321881))
            Line((-2, 191.789321881), (-7, 191.789321881))
            Line((-7, 191.789321881), (-7, 197.789321881))
            Line((-7, 197.789321881), (-7, 203.789321881))
            Line((-7, 203.789321881), (-7, 209.789321881))
            Line((-7, 209.789321881), (-2, 209.789321881))
            ThreePointArc((-2, 209.789321881), (-0.585786438, 209.203535444), (0, 207.789321881))
        make_face()
        with Locations((-3.5, 206.789321881)):
            Circle(ESQUISSE55_R, mode=Mode.SUBTRACT)
        with Locations((-3.5, 194.789321881)):
            Circle(ESQUISSE55_R, mode=Mode.SUBTRACT)
        with Locations((-3.5, 200.789321881)):
            Circle(ESQUISSE55_R, mode=Mode.SUBTRACT)
    # profile 2 of 2: a face of its own
    with BuildSketch(Plane(origin=(0, 0, 33.935028843), x_dir=(-1, 0, 0), z_dir=(0, 0, -1)).offset(-BOSS_EXTRU_44_DEPTH_BACK)):
        with BuildLine():
            Line((-35, 195.789321881), (-35, 193.789321881))
            ThreePointArc((-35, 193.789321881), (-34.414213562, 192.375108319), (-33, 191.789321881))
            Line((-33, 191.789321881), (-28, 191.789321881))
            Line((-28, 191.789321881), (-28, 197.789321881))
            Line((-28, 197.789321881), (-28, 203.789321881))
            Line((-28, 203.789321881), (-28, 209.789321881))
            Line((-28, 209.789321881), (-33, 209.789321881))
            ThreePointArc((-33, 209.789321881), (-34.414213562, 209.203535444), (-35, 207.789321881))
            Line((-35, 207.789321881), (-35, 205.789321881))
            Line((-35, 205.789321881), (-35, 201.789321881))
            Line((-35, 201.789321881), (-35, 199.789321881))
            Line((-35, 199.789321881), (-35, 195.789321881))
        make_face()
        with Locations((-31.5, 194.789321881)):
            Circle(ESQUISSE55_R, mode=Mode.SUBTRACT)
        with Locations((-31.5, 206.789321881)):
            Circle(ESQUISSE55_R, mode=Mode.SUBTRACT)
        with Locations((-31.5, 200.789321881)):
            Circle(ESQUISSE55_R, mode=Mode.SUBTRACT)
    extrude(amount=BOSS_EXTRU_44_DEPTH + BOSS_EXTRU_44_DEPTH_BACK)

    # Esquisse56 → Enlèv. mat.-Extru.16 (cut)
    # profile 1 of 7: a face of its own
    with BuildSketch(Plane(origin=(0, 282, 0), x_dir=(1, 0, 0), z_dir=(0, 1, 0))):
        with BuildLine():
            Line((-62.5, -33.935028843), (0, -33.935028843))
            Line((0, -33.935028843), (0, -4))
            ThreePointArc((0, -4), (1.171572875, -1.171572875), (4, 0))
            Line((4, 0), (31, 0))
            ThreePointArc((31, 0), (33.828427125, -1.171572875), (35, -4))
            Line((35, -4), (35, -33.935028843))
            Line((35, -33.935028843), (97.5, -33.935028843))
            Line((97.5, -33.935028843), (137.880494562, -33.935028843))
            Line((137.880494562, -33.935028843), (137.880494562, 14.445563897))
            Line((137.880494562, 14.445563897), (-77.143975035, 14.445563897))
            Line((-77.143975035, 14.445563897), (-77.143975035, -33.935028843))
            Line((-77.143975035, -33.935028843), (-62.5, -33.935028843))
        make_face()
    # profile 2 of 7: a face of its own
    with BuildSketch(Plane(origin=(0, 282, 0), x_dir=(1, 0, 0), z_dir=(0, 1, 0))):
        with BuildLine():
            Line((0, -33.935028843), (1, -33.935028843))
            Line((1, -33.935028843), (35, -33.935028843))
            Line((35, -33.935028843), (35, -4))
            ThreePointArc((35, -4), (33.828427125, -1.171572875), (31, 0))
            Line((31, 0), (4, 0))
            ThreePointArc((4, 0), (1.171572875, -1.171572875), (0, -4))
            Line((0, -4), (0, -33.935028843))
        make_face()
        with Locations((4.064971157, -30.935028843)):
            Circle(ESQUISSE56_R, mode=Mode.SUBTRACT)
        with Locations((17.5, -17.5)):
            Circle(ESQUISSE56_R_2, mode=Mode.SUBTRACT)
        with Locations((30.935028843, -30.935028843)):
            Circle(ESQUISSE56_R, mode=Mode.SUBTRACT)
        with Locations((4.064970946, -4.064971369)):
            Circle(ESQUISSE56_R, mode=Mode.SUBTRACT)
        with Locations((30.935028631, -4.064970946)):
            Circle(ESQUISSE56_R, mode=Mode.SUBTRACT)
    # profile 3 of 7: a face of its own
    with BuildSketch(Plane(origin=(0, 282, 0), x_dir=(1, 0, 0), z_dir=(0, 1, 0))):
        with Locations((4.064970946, -4.064971369)):
            Circle(ESQUISSE56_R)
    # profile 4 of 7: a face of its own
    with BuildSketch(Plane(origin=(0, 282, 0), x_dir=(1, 0, 0), z_dir=(0, 1, 0))):
        with Locations((4.064971157, -30.935028843)):
            Circle(ESQUISSE56_R)
    # profile 5 of 7: a face of its own
    with BuildSketch(Plane(origin=(0, 282, 0), x_dir=(1, 0, 0), z_dir=(0, 1, 0))):
        with Locations((30.935028843, -30.935028843)):
            Circle(ESQUISSE56_R)
    # profile 6 of 7: a face of its own
    with BuildSketch(Plane(origin=(0, 282, 0), x_dir=(1, 0, 0), z_dir=(0, 1, 0))):
        with Locations((30.935028631, -4.064970946)):
            Circle(ESQUISSE56_R)
    # profile 7 of 7: a face of its own
    with BuildSketch(Plane(origin=(0, 282, 0), x_dir=(1, 0, 0), z_dir=(0, 1, 0))):
        with Locations((17.5, -17.5)):
            Circle(ESQUISSE56_R_2)
    extrude(amount=-ENL_V_MAT_EXTRU_16_DEPTH, mode=Mode.SUBTRACT)

    # Esquisse57 → Enlèv. mat.-Extru.17 (cut)
    with BuildSketch(Plane(origin=(0, 0, 33.935028843), x_dir=(-1, 0, 0), z_dir=(0, 0, -1))):
        with Locations((-17.5, 246.64466094)):
            Rectangle(ESQUISSE57_W, ESQUISSE57_H)
    extrude(amount=-ENL_V_MAT_EXTRU_17_DEPTH, mode=Mode.SUBTRACT)

    # Esquisse60 → Boss.-Extru.46 (add, two sides: drawn at the far end of the back side and taken through both)
    # profile 1 of 3: a face of its own
    with BuildSketch(Plane(origin=(0, 203.289321881, 0), x_dir=(1, 0, 0), z_dir=(0, 1, 0)).offset(-BOSS_EXTRU_46_DEPTH_BACK)):
        Polygon((28, -93.935028843), (17.5, -93.935028843), (7, -93.935028843), (-8, -118.935028843), (-8, -146.935028843), (2, -156.935028843), (33, -156.935028843), (43, -146.935028843), (43, -118.935028843), align=None)
        Polygon((28, -118.935028843), (33, -118.935028843), (33, -146.935028843), (2, -146.935028843), (2, -118.935028843), (7, -118.935028843), align=None, mode=Mode.SUBTRACT)
    # profile 2 of 3: a face of its own
    with BuildSketch(Plane(origin=(0, 203.289321881, 0), x_dir=(1, 0, 0), z_dir=(0, 1, 0)).offset(-BOSS_EXTRU_46_DEPTH_BACK)):
        Polygon((33, -146.935028843), (33, -118.935028843), (28, -118.935028843), (7, -118.935028843), (2, -118.935028843), (2, -146.935028843), align=None)
        with Locations(Location((5, -130.435028843, 0), (0, 0, 270))):
            Circle(ESQUISSE60_R, mode=Mode.SUBTRACT)
        with Locations(Location((5, -144.935028843, 0), (0, 0, 270))):
            Circle(ESQUISSE60_R, mode=Mode.SUBTRACT)
        with Locations(Location((30, -130.435028843, 0), (0, 0, 270))):
            Circle(ESQUISSE60_R, mode=Mode.SUBTRACT)
        with Locations(Location((30, -144.935028843, 0), (0, 0, 270))):
            Circle(ESQUISSE60_R, mode=Mode.SUBTRACT)
        with BuildLine():
            ThreePointArc((7, -144.935028843), (6.414213562, -143.52081528), (5, -142.935028843))
            Line((5, -142.935028843), (5, -132.435028843))
            ThreePointArc((5, -132.435028843), (7, -130.435028843), (5, -128.435028843))
            Line((5, -128.435028843), (5, -123.319506434))
            Line((5, -123.319506434), (30, -123.319506434))
            Line((30, -123.319506434), (30, -128.435028843))
            ThreePointArc((30, -128.435028843), (28, -130.435028843), (30, -132.435028843))
            Line((30, -132.435028843), (30, -142.935028843))
            ThreePointArc((30, -142.935028843), (28.585786438, -143.52081528), (28, -144.935028843))
            Line((28, -144.935028843), (7, -144.935028843))
        make_face(mode=Mode.SUBTRACT)
    # profile 3 of 3: a face of its own
    with BuildSketch(Plane(origin=(0, 203.289321881, 0), x_dir=(1, 0, 0), z_dir=(0, 1, 0)).offset(-BOSS_EXTRU_46_DEPTH_BACK)):
        with BuildLine():
            Line((5, -142.935028843), (5, -132.435028843))
            ThreePointArc((5, -132.435028843), (7, -130.435028843), (5, -128.435028843))
            Line((5, -128.435028843), (5, -123.319506434))
            Line((5, -123.319506434), (30, -123.319506434))
            Line((30, -123.319506434), (30, -128.435028843))
            ThreePointArc((30, -128.435028843), (28, -130.435028843), (30, -132.435028843))
            Line((30, -132.435028843), (30, -142.935028843))
            ThreePointArc((30, -142.935028843), (28.585786438, -143.52081528), (28, -144.935028843))
            Line((28, -144.935028843), (7, -144.935028843))
            ThreePointArc((7, -144.935028843), (6.414213562, -143.52081528), (5, -142.935028843))
        make_face()
    extrude(amount=BOSS_EXTRU_46_DEPTH + BOSS_EXTRU_46_DEPTH_BACK)

    # Esquisse61 → Enlèv. mat.-Extru.18 (cut)
    with BuildSketch(Plane(origin=(0, 205.289321881, 0), x_dir=(1, 0, 0), z_dir=(0, 1, 0))):
        with Locations(Location((7.1, -150.438978733, 0), (0, 0, 270))):
            Circle(ESQUISSE61_R)
        with Locations(Location((27.9, -150.438978733, 0), (0, 0, 270))):
            Circle(ESQUISSE61_R)
        with Locations(Location((7.1, -138.038978733, 0), (0, 0, 270))):
            Circle(ESQUISSE61_R)
        with Locations(Location((27.9, -138.038978733, 0), (0, 0, 270))):
            Circle(ESQUISSE61_R)
        Polygon((9.6, -138.038978733), (9.6, -153.038978733), (25.4, -153.038978733), (25.4, -138.038978733), (25.4, -127.038978733), (9.6, -127.038978733), align=None)
    extrude(amount=-ENL_V_MAT_EXTRU_18_DEPTH, mode=Mode.SUBTRACT)

    # Esquisse64 → Boss.-Extru.47 (add)
    with BuildSketch(Plane(origin=(0, 205.289321881, 0), x_dir=(1, 0, 0), z_dir=(0, 1, 0)).offset(BOSS_EXTRU_47_START)):
        with Locations((5, -130.435028843)):
            Circle(ESQUISSE64_R)
        with Locations((5, -144.935028843)):
            Circle(ESQUISSE64_R)
        with Locations((30, -144.935028843)):
            Circle(ESQUISSE64_R)
        with Locations((30, -130.435028843)):
            Circle(ESQUISSE64_R)
    extrude(amount=BOSS_EXTRU_47_DEPTH)


solid = part.part
